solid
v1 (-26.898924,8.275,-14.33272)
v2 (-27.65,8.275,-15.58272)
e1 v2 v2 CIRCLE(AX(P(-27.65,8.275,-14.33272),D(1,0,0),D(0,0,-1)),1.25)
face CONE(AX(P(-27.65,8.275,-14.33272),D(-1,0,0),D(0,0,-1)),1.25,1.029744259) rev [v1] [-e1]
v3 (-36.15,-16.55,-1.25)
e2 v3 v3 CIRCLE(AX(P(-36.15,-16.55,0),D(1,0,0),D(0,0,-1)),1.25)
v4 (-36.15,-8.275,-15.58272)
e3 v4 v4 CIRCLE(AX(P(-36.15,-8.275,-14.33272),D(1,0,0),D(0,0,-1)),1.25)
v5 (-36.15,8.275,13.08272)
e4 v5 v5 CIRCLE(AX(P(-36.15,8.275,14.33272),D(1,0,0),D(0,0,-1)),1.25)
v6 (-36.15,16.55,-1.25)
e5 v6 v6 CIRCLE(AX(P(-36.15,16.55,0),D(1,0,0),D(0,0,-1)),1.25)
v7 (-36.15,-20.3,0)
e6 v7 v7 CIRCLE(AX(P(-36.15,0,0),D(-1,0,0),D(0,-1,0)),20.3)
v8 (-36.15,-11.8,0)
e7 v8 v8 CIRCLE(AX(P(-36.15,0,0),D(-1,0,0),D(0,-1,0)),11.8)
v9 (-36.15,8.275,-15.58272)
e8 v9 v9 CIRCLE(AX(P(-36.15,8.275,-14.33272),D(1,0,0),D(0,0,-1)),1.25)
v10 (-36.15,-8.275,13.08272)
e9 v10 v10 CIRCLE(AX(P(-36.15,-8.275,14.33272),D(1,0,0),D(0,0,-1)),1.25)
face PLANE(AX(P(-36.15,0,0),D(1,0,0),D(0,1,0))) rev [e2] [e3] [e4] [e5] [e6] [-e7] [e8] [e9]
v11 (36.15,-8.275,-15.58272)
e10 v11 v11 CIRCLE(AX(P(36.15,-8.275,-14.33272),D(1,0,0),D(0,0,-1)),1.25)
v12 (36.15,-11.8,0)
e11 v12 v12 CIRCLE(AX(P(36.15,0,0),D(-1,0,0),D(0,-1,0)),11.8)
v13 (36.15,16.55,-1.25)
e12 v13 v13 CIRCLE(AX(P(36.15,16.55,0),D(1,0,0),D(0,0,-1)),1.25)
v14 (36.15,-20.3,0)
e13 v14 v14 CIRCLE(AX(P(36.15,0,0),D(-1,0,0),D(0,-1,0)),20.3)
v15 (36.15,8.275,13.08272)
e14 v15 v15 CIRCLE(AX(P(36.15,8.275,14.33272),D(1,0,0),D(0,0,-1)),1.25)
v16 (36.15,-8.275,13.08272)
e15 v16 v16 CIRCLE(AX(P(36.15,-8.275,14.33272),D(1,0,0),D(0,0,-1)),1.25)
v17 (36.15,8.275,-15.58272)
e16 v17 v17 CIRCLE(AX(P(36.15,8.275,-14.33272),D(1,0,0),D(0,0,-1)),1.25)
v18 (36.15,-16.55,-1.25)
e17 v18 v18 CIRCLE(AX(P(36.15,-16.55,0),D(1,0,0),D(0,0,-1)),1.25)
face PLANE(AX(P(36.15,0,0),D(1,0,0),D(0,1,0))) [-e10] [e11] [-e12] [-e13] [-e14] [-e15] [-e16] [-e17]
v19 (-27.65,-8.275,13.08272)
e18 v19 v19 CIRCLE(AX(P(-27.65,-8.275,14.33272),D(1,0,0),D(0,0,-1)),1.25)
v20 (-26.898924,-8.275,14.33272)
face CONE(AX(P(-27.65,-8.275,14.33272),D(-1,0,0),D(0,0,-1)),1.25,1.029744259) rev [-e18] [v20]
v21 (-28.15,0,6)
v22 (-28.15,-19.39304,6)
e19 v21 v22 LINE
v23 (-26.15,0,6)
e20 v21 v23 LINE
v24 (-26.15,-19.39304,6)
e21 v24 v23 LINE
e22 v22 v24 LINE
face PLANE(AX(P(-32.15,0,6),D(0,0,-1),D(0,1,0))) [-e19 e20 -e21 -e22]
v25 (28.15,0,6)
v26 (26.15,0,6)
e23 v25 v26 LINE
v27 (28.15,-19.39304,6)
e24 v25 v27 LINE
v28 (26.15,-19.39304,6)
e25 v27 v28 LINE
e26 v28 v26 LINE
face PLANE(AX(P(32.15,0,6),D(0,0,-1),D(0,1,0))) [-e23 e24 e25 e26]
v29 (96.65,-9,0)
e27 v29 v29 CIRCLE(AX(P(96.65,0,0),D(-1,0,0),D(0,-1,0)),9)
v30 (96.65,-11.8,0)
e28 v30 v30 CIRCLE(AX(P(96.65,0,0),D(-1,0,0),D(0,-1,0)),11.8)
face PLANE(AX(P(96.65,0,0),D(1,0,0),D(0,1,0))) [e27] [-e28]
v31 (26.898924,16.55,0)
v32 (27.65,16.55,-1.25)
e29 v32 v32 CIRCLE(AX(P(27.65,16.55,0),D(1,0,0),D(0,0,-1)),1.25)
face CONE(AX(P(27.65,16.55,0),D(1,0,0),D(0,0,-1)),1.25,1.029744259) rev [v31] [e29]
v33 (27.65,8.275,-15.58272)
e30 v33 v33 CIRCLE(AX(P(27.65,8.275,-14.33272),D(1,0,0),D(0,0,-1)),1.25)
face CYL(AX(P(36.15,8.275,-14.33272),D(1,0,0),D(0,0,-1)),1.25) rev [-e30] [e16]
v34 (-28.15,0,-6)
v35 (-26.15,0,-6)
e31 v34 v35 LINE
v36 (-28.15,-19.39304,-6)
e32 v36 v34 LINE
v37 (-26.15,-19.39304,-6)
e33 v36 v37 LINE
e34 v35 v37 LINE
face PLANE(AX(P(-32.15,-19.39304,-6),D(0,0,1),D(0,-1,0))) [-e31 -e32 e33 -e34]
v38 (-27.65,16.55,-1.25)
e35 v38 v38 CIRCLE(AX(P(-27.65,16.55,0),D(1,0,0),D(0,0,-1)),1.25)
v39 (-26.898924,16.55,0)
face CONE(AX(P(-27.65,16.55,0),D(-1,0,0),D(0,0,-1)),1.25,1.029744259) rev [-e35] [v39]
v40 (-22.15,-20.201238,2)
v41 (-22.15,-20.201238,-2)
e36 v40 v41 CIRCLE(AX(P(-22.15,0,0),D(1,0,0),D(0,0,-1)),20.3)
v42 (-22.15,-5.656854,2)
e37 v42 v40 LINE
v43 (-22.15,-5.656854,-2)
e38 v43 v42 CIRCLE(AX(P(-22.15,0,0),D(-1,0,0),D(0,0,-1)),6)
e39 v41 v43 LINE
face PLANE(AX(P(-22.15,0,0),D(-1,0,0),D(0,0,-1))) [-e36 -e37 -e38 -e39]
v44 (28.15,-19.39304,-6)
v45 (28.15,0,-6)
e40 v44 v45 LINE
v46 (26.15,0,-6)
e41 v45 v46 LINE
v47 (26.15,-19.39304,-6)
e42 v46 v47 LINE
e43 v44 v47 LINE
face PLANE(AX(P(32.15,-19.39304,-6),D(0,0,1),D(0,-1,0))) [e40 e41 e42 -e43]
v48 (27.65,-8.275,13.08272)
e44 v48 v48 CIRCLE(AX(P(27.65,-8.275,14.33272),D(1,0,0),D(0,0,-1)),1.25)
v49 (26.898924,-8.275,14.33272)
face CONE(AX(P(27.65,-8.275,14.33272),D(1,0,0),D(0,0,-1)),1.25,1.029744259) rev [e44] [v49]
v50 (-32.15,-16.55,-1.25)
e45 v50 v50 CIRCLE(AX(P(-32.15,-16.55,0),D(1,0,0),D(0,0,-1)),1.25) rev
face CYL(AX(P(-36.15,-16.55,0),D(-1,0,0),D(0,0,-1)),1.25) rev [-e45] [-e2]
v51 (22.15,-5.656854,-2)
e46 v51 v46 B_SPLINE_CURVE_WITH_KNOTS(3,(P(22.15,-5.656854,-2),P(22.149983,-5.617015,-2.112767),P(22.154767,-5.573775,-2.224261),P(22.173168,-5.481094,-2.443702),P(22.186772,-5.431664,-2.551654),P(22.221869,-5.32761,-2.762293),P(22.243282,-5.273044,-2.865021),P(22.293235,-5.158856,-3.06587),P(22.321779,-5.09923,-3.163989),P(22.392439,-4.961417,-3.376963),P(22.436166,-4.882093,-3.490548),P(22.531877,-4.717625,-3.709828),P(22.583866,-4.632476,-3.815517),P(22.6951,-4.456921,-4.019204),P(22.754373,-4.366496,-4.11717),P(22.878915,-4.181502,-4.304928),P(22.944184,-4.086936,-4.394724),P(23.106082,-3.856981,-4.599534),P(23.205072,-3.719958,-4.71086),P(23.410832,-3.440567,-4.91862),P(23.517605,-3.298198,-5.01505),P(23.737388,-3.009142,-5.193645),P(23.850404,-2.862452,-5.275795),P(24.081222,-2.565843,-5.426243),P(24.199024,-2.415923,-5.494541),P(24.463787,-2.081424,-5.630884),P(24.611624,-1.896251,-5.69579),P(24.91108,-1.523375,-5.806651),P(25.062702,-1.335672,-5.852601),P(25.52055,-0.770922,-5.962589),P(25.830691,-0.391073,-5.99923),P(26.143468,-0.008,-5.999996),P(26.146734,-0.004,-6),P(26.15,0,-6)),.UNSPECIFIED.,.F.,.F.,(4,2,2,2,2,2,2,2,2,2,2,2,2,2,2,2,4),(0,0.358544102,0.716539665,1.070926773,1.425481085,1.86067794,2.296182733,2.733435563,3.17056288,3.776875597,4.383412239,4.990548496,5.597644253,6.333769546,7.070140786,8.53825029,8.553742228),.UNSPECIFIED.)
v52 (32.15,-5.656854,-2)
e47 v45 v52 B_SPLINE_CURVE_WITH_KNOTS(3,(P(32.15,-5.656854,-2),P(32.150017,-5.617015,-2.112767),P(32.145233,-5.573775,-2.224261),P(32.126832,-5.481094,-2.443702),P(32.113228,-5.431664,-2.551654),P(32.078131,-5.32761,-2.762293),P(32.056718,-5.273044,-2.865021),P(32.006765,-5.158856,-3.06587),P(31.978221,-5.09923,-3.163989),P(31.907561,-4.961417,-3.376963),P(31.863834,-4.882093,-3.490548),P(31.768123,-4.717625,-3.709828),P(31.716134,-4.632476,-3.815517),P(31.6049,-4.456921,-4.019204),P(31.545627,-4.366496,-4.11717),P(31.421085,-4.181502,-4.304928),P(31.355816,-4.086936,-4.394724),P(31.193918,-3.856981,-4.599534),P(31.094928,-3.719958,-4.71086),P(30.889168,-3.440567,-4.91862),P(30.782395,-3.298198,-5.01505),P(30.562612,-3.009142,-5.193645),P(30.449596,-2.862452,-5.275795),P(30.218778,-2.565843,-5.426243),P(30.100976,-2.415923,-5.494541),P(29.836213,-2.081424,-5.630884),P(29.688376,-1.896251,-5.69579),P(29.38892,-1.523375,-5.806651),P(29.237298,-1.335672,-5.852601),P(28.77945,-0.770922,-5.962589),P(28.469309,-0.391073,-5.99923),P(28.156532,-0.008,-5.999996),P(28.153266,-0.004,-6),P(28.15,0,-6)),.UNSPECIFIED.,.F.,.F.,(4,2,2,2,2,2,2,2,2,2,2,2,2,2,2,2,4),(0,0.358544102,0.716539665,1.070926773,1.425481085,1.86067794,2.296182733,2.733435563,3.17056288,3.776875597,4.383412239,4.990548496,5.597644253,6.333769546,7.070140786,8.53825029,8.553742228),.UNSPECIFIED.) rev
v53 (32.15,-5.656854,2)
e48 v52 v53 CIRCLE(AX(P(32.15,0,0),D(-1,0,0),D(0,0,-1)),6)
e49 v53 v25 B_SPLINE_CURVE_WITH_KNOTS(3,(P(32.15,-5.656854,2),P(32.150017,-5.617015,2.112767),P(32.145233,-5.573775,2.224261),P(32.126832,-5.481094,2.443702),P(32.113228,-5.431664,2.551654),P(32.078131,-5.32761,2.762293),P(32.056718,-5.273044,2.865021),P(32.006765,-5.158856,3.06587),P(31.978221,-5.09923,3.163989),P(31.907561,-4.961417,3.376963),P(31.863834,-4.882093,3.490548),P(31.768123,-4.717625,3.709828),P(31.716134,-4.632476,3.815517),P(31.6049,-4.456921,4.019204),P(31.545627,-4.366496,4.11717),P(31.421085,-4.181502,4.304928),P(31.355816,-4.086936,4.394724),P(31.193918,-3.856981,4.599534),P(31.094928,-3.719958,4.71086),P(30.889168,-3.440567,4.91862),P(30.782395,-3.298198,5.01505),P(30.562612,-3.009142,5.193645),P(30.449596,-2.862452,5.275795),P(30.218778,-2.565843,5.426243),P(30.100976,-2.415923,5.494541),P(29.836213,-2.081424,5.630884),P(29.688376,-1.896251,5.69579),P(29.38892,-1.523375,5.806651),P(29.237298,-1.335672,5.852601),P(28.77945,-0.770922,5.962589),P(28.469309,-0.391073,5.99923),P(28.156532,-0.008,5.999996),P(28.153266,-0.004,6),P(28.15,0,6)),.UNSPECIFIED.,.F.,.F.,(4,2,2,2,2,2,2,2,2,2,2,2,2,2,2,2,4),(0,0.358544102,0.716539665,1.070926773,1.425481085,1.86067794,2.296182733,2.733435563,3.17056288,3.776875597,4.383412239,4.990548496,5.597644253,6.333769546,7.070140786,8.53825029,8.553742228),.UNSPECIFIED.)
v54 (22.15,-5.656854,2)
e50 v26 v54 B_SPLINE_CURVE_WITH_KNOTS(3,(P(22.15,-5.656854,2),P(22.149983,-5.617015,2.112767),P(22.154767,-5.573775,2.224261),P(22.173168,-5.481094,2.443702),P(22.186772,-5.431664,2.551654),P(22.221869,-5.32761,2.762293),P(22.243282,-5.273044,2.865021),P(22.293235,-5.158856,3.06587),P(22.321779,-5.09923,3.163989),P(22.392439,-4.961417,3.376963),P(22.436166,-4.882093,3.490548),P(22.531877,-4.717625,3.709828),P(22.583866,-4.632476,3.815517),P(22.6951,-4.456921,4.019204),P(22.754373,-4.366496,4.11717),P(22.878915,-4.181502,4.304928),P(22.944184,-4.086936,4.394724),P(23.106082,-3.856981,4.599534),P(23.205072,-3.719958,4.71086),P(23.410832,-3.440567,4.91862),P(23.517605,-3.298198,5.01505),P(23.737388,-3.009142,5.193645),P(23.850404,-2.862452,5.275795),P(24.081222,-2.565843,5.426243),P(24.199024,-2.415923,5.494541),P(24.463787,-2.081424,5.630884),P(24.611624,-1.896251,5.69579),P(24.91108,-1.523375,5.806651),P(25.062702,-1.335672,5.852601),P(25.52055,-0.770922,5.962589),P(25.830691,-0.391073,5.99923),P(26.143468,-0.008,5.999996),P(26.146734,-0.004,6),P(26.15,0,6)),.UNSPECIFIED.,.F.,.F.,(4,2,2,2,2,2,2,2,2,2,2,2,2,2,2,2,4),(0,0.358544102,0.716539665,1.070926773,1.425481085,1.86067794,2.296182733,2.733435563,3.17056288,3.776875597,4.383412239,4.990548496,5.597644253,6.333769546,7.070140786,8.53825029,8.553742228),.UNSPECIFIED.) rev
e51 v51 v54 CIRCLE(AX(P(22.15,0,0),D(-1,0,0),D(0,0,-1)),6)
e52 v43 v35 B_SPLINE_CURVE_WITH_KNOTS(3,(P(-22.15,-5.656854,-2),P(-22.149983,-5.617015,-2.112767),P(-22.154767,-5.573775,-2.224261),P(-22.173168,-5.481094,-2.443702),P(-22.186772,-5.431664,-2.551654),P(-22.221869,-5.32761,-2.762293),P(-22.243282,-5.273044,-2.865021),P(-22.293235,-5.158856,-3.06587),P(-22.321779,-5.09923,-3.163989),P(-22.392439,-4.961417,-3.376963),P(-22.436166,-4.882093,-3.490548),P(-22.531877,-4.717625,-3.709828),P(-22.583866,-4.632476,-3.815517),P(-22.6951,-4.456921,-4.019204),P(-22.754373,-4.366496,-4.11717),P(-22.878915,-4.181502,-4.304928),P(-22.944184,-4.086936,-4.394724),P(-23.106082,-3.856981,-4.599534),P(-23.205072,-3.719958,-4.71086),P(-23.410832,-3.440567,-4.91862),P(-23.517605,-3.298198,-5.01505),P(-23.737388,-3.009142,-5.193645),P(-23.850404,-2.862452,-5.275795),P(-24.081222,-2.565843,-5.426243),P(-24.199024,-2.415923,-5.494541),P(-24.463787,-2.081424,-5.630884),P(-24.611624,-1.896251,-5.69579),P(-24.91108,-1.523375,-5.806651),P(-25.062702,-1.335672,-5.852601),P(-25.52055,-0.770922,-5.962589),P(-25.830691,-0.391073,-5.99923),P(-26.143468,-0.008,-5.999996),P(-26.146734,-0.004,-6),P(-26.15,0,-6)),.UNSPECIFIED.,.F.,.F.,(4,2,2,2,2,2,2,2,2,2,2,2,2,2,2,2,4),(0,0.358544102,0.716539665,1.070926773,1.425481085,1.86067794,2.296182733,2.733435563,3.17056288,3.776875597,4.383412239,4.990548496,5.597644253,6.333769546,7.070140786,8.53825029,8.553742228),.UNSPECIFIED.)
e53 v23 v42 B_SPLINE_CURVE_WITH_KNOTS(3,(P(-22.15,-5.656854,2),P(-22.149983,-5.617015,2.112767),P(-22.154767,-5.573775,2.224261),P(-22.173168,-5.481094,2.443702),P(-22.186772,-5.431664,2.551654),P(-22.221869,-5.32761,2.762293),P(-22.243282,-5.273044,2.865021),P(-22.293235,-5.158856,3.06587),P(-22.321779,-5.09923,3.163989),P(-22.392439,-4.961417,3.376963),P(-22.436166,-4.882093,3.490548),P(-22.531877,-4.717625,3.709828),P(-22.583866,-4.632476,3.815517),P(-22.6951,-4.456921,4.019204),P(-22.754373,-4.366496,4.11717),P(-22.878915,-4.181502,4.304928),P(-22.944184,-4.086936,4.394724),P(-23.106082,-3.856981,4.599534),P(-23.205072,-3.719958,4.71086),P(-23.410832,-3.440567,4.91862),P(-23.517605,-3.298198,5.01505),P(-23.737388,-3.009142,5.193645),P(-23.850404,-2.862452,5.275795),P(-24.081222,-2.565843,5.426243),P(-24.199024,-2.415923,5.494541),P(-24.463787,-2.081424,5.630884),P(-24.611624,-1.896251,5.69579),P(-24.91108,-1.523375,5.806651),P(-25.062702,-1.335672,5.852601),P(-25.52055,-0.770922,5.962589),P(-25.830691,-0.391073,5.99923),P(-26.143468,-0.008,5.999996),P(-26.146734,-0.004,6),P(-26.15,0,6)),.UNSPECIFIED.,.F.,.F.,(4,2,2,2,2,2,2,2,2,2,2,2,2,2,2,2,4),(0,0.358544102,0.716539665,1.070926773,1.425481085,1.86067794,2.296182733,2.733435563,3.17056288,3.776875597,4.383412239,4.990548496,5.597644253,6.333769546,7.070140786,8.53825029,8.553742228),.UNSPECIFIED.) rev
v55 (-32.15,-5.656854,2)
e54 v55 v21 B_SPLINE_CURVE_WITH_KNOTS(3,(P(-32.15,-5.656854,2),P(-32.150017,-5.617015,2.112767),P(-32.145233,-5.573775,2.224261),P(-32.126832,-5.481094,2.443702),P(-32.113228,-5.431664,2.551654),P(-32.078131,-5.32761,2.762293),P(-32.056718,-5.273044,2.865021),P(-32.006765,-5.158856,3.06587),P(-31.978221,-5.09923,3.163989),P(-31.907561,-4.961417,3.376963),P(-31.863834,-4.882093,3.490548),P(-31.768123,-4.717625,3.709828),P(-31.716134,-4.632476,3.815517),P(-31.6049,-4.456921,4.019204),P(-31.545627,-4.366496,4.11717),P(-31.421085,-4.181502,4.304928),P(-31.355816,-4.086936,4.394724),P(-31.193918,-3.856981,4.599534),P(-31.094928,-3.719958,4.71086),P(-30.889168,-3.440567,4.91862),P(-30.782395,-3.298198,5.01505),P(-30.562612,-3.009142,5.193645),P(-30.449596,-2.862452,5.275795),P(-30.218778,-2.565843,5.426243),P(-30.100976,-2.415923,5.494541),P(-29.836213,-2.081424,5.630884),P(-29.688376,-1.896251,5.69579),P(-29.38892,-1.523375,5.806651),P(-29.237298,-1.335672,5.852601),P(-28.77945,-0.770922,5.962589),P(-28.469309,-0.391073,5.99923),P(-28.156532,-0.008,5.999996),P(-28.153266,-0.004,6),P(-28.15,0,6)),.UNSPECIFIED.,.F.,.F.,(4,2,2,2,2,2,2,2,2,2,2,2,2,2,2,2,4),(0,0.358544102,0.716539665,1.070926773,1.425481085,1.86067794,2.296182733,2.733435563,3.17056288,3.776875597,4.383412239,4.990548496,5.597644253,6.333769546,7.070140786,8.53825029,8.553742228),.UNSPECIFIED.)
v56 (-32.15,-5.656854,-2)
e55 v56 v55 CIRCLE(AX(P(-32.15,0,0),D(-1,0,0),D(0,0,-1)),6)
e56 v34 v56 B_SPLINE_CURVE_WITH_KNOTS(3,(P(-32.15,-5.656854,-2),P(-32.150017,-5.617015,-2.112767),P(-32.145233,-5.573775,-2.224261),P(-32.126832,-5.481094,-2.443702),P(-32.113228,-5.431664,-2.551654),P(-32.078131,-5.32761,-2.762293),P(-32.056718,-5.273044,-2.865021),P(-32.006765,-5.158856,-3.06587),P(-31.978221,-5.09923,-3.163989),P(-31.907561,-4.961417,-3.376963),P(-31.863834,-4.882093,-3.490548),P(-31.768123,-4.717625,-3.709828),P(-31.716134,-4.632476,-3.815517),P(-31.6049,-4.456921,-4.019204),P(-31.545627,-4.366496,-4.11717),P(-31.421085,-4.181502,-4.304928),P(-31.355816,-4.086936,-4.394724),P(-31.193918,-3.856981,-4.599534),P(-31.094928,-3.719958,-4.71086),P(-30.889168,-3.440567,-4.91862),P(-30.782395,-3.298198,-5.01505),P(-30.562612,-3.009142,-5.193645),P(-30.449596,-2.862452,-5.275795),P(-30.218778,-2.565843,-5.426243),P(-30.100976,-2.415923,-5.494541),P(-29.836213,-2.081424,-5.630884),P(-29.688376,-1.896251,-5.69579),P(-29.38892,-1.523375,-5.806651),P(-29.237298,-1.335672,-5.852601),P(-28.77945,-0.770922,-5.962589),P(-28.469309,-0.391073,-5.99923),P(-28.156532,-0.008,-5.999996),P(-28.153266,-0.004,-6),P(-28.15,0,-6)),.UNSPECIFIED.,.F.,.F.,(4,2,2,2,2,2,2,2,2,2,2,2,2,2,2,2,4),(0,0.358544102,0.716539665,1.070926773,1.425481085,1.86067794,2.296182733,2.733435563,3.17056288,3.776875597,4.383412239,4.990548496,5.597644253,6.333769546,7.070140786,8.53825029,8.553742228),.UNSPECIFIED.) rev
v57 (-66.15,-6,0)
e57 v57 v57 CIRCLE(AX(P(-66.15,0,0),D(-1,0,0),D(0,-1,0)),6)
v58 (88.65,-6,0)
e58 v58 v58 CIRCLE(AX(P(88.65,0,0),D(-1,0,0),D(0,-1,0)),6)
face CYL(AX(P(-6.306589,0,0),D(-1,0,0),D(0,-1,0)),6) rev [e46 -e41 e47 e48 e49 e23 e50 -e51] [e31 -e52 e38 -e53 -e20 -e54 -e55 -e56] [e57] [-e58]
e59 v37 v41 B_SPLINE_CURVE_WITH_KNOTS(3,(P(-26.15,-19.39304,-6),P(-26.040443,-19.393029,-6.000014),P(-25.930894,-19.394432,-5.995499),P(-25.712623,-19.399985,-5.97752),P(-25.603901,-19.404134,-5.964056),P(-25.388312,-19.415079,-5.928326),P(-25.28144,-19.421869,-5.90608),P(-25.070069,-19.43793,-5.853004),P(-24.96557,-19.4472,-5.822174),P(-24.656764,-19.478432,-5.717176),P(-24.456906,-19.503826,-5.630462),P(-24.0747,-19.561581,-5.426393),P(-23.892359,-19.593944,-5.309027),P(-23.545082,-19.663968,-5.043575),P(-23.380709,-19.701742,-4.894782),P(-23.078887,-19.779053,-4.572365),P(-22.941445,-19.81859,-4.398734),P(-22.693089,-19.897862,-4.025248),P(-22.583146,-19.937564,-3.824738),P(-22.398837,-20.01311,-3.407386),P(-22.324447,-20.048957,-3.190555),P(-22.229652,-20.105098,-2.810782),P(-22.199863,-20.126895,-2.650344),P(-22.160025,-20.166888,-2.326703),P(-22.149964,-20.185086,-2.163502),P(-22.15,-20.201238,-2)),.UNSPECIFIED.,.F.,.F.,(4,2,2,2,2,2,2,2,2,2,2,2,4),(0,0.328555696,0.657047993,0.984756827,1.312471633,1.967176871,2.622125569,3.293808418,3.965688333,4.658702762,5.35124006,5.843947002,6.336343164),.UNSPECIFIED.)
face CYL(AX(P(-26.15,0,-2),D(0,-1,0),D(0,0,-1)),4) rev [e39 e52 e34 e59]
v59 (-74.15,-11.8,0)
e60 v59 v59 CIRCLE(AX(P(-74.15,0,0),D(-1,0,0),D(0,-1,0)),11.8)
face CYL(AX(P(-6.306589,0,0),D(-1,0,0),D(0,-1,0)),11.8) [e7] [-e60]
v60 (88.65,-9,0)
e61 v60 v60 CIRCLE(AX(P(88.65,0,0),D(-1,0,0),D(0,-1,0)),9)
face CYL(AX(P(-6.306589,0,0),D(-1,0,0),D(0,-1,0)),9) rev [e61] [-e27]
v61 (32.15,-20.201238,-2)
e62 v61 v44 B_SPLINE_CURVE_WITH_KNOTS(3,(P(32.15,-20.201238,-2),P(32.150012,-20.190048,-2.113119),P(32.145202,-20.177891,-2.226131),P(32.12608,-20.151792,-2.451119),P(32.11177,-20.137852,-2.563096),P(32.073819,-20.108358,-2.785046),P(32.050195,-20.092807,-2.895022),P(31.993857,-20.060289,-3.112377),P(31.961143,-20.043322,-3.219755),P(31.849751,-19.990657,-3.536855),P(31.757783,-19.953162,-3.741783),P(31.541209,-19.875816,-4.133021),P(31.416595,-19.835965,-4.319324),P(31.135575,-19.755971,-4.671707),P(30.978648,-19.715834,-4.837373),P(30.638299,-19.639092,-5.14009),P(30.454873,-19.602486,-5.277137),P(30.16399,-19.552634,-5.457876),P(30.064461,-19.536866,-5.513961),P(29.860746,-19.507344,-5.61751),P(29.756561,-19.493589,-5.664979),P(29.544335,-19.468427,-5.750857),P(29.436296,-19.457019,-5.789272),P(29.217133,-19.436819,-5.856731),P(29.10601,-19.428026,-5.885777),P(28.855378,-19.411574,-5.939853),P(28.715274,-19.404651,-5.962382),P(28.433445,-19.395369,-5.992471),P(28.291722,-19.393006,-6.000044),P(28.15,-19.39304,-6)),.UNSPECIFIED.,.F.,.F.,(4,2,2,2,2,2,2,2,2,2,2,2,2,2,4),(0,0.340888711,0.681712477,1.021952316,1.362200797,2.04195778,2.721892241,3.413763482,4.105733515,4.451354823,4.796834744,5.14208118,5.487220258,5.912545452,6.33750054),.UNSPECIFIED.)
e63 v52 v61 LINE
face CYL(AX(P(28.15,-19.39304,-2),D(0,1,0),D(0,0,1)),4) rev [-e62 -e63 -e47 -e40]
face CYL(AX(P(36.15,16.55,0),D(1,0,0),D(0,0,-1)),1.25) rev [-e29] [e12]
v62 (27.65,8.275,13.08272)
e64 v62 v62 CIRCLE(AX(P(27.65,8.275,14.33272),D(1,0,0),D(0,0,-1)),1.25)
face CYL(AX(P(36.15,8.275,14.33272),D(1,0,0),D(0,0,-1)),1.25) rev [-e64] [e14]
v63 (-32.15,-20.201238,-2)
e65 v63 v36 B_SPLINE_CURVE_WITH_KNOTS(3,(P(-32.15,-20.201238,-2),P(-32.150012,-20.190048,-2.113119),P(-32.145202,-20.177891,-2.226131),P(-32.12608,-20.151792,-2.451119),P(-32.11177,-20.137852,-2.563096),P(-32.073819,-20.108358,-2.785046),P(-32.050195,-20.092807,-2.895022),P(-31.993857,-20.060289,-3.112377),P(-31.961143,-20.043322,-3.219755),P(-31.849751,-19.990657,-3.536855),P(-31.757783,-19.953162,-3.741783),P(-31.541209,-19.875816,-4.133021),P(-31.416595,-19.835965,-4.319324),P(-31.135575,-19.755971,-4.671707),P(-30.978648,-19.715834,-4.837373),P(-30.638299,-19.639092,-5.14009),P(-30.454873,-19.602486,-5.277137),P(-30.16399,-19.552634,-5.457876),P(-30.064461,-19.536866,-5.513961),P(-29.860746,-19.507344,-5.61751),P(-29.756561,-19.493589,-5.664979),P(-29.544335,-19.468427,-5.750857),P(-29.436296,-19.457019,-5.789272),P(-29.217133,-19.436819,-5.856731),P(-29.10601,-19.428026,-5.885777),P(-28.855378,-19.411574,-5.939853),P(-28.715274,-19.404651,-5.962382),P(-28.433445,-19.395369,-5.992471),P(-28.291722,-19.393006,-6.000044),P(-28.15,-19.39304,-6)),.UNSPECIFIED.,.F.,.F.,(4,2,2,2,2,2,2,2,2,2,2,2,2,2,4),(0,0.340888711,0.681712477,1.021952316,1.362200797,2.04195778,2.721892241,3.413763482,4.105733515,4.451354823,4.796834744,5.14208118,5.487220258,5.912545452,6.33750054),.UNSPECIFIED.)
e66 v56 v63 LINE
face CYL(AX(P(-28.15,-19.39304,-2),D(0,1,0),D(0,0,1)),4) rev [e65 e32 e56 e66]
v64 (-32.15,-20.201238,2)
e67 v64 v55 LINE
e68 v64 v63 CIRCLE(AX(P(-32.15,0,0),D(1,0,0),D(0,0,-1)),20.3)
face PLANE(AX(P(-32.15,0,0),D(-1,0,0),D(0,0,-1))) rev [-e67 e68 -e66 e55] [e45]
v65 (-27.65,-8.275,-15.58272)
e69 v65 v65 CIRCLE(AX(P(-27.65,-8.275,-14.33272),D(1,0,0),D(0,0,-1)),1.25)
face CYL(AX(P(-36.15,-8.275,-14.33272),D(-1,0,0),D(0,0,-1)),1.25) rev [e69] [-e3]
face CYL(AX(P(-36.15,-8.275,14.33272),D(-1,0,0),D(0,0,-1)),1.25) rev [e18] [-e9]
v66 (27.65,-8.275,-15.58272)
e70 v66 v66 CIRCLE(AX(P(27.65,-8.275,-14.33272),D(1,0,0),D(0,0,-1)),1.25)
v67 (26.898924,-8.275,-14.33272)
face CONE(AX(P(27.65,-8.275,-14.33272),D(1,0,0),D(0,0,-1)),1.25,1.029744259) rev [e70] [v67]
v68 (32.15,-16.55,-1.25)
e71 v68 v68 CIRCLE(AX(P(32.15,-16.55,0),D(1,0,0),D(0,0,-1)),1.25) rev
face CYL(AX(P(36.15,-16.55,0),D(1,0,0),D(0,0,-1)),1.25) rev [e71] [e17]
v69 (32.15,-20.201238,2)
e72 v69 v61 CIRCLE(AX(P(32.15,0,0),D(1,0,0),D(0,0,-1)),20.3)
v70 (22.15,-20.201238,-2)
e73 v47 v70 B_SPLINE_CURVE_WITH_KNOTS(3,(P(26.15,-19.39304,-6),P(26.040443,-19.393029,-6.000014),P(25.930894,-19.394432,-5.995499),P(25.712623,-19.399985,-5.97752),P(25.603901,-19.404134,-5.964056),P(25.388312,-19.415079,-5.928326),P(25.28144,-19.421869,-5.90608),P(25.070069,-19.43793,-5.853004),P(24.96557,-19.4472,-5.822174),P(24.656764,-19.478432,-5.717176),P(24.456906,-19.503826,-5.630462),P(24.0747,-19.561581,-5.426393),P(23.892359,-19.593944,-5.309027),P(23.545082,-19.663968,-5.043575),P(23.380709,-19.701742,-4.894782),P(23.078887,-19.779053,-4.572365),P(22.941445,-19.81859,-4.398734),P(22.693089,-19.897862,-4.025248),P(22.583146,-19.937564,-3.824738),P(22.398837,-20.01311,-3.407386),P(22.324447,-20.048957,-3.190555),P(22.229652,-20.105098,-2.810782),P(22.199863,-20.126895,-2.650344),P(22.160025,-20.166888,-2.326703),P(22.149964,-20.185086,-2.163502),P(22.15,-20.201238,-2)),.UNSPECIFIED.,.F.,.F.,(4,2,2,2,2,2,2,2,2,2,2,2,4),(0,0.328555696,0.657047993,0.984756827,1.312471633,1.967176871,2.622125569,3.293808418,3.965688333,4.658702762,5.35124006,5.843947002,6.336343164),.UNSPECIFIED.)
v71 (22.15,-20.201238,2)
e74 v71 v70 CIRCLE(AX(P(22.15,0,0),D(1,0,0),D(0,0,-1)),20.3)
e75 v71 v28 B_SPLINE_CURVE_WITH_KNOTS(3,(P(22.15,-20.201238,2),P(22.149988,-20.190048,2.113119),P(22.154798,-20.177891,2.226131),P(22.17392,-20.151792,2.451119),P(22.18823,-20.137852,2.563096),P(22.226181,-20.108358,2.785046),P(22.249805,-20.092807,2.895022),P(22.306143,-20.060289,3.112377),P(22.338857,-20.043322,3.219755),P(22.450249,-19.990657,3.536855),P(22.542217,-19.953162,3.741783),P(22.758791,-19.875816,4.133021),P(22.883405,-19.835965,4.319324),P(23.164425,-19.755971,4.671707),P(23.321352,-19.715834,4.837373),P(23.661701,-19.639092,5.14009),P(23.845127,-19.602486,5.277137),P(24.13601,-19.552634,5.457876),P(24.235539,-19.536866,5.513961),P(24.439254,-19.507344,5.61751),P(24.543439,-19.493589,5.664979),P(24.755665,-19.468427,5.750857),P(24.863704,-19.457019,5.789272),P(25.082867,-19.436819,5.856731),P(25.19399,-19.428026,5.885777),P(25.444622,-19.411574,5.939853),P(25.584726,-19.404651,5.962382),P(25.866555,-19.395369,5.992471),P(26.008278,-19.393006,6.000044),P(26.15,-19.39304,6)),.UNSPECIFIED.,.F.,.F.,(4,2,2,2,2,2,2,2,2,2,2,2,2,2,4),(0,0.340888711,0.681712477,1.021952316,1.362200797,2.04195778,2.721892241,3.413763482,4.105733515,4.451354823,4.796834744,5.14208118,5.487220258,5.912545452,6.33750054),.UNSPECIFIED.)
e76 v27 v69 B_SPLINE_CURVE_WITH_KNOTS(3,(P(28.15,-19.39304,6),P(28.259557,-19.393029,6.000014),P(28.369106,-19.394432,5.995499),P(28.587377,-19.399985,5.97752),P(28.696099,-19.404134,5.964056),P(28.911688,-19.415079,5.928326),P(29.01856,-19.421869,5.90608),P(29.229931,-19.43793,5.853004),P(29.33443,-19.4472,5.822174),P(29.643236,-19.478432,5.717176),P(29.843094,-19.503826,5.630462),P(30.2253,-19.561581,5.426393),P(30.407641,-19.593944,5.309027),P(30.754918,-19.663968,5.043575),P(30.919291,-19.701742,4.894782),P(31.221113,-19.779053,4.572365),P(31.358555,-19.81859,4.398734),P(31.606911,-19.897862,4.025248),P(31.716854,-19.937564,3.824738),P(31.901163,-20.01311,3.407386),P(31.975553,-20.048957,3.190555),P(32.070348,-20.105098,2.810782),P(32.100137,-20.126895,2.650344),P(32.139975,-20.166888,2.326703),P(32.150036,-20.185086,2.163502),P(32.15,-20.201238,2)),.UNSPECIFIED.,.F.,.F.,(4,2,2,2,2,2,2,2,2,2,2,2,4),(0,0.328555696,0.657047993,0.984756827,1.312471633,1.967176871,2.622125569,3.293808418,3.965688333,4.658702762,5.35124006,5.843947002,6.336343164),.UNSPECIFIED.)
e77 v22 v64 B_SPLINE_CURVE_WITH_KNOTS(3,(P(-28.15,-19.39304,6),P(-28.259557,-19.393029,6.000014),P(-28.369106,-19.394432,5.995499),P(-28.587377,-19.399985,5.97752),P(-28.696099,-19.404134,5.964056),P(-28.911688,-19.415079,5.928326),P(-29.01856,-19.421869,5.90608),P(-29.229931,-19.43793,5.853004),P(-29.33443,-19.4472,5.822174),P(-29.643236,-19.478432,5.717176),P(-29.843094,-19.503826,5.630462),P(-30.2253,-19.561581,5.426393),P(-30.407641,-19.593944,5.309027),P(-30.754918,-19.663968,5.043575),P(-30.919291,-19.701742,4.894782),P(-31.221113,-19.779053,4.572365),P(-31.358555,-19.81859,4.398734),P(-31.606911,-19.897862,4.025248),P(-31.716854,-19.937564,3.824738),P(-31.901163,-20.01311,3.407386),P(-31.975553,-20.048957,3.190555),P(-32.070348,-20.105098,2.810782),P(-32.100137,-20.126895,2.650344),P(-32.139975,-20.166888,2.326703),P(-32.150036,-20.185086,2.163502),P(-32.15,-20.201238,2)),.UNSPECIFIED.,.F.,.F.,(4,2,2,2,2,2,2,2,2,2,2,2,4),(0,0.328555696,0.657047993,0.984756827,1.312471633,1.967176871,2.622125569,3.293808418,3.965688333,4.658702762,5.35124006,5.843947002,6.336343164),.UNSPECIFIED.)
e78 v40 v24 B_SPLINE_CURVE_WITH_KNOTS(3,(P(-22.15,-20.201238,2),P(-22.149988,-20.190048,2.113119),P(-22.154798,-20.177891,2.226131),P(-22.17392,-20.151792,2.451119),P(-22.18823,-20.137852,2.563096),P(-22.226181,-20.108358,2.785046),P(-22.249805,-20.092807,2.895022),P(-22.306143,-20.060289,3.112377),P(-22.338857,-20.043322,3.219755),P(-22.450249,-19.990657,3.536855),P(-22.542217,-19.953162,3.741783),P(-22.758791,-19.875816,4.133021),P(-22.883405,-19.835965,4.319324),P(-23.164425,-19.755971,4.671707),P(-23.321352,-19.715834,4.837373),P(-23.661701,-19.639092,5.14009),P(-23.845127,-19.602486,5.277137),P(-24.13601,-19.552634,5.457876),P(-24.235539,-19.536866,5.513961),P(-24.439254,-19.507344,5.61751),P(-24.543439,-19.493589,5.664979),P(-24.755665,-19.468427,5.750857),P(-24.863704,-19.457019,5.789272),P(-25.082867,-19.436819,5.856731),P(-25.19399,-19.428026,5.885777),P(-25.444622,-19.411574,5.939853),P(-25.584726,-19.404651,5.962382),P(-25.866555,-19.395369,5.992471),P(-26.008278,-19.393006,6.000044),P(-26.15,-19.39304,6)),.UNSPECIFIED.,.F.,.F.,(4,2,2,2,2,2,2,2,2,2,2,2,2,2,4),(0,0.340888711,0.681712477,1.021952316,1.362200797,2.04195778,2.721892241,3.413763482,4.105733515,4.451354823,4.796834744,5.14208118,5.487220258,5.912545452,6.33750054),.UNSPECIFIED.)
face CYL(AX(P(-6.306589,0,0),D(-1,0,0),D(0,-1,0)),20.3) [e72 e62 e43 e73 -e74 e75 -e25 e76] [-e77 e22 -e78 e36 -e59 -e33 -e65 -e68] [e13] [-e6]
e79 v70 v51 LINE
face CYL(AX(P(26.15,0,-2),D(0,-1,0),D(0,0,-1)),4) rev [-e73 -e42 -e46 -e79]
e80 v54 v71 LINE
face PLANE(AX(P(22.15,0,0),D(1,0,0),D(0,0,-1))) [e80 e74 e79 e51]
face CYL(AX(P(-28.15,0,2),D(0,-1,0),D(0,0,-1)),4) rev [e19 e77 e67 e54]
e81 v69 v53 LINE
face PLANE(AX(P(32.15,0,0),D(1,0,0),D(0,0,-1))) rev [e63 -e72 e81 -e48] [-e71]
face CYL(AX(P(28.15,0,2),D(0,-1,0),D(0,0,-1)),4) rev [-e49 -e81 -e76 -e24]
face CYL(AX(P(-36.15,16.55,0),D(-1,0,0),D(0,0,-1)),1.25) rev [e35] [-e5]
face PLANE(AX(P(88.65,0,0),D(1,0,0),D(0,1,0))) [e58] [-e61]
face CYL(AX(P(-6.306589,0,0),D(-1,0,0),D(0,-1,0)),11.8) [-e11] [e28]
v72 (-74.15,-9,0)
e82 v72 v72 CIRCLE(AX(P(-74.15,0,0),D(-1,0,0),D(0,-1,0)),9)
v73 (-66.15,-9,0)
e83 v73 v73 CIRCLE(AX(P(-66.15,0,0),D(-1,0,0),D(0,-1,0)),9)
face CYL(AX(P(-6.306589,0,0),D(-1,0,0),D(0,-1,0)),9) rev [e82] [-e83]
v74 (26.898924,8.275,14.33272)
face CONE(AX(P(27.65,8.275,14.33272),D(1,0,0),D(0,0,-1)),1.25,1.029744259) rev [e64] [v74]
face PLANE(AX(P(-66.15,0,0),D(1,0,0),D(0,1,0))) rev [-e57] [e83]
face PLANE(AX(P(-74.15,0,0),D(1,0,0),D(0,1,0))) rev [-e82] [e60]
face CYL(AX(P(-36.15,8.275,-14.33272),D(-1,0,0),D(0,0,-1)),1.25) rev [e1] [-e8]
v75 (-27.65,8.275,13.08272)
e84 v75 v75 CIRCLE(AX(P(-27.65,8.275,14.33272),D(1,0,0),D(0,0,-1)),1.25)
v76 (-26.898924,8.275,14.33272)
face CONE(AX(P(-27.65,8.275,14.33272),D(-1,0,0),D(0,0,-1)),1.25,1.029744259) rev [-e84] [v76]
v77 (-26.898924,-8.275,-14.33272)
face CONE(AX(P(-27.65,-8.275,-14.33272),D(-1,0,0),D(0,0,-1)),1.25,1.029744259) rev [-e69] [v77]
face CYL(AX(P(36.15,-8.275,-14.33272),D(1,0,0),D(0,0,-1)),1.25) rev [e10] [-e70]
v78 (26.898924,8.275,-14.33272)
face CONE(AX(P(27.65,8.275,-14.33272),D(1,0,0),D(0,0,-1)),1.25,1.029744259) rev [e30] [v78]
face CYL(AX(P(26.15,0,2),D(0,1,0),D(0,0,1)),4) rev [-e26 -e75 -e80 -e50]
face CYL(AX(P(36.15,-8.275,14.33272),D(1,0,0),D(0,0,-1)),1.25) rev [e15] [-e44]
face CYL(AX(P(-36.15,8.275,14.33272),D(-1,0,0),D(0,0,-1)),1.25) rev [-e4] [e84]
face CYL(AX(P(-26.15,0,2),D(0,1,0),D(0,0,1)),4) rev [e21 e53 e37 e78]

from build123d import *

# Parameters (mm, degrees)
CIRPATTERN1_COUNT   = 6
CUT_EXTRUDE2_START  = 22.15
CUT_EXTRUDE2_DEPTH  = 10
FILLET1_R           = 4
MIRROR1_START       = -36.15
MIRROR1_OUTLINE_R   = 1.25
MIRROR1_DEPTH       = 8.4999999
MIRROR1_START_2     = -28.15
MIRROR1_2_OUTLINE_R = 1.25
MIRROR1_2_DEPTH     = 6
MIRROR1_START_3     = -21
MIRROR1_3_DEPTH     = 21


with BuildPart() as part:
    # Sketch1 → Revolve1 (revolve)
    with BuildSketch(Plane.XY, mode=Mode.PRIVATE) as revolve1_sk:
        Polygon((0, 6), (0, 20.3), (36.15, 20.3), (36.15, 11.8), (96.65, 11.8), (96.65, 9), (88.65, 9), (88.65, 6), align=None)
    revolve(revolve1_sk.sketch.rotate(Axis((-6.306589334, 0, 0), (1, 0, 0)), 180), axis=Axis((-6.306589334, 0, 0), (1, 0, 0)))

    # Sketch4 → M3 Tapped Hole1 (revolve, cut)
    with BuildSketch(Plane(origin=(36.15, 16.55, 0), x_dir=(0, 0, -1), z_dir=(0, 1, 0))):
        Polygon((0, 0), (0, 9.251075774), (1.25, 8.5), (1.25, 0), align=None)
    m3_tapped_hole1 = revolve(axis=Axis((42.5, 16.55, 0), (-1, 0, 0)), mode=Mode.SUBTRACT)

    # CirPattern1: M3 Tapped Hole1 ×6 about axis
    cirpattern1_axis = Axis((0, 0, 0), (1, 0, 0))
    for i in range(1, CIRPATTERN1_COUNT):
        add(m3_tapped_hole1.rotate(cirpattern1_axis, i * 360 / CIRPATTERN1_COUNT), mode=Mode.SUBTRACT)

    # Sketch5 → Cut-Extrude2 (cut)
    with BuildSketch(Plane(origin=(0, 0, 0), x_dir=(0, 0, -1), z_dir=(1, 0, 0)).offset(CUT_EXTRUDE2_START)):
        with BuildLine():
            Line((-6, 0), (-6, -19.393039989))
            ThreePointArc((-6, -19.393039989), (0, -20.3), (6, -19.393039989))
            Line((6, -19.393039989), (6, 0))
            ThreePointArc((6, 0), (0, -6), (-6, 0))
        make_face()
    extrude(amount=CUT_EXTRUDE2_DEPTH, mode=Mode.SUBTRACT)

    # Sketch1<3> → Revolve2 (revolve)
    with BuildSketch(Plane.XY, mode=Mode.PRIVATE) as revolve2_sk:
        Polygon((-66.15, 9), (-66.15, 6), (0, 6), (0, 20.3), (-36.15, 20.3), (-36.15, 11.8), (-74.15, 11.8), (-74.15, 9), align=None)
    revolve(revolve2_sk.sketch.rotate(Axis((-6.306589334, 0, 0), (1, 0, 0)), 180), axis=Axis((-6.306589334, 0, 0), (1, 0, 0)))

    # Fillet1
    # the kernel refuses this fillet: 4 mm, written as the material it adds along each edge
    with BuildSketch(Plane(origin=(32.15, 10, 6), x_dir=(-1, 0, 0), z_dir=(0, -1, 0))) as fillet1_piece_1_section:
        with BuildLine():
            CenterArc((FILLET1_R, FILLET1_R), FILLET1_R, 180, 90)
            Line((0, FILLET1_R), (0, 0))
            Line((0, 0), (FILLET1_R, 0))
        make_face()
    fillet1_piece_1 = extrude(amount=39.393039989, mode=Mode.PRIVATE)
    fillet1_piece_1 = fillet1_piece_1 - Plane(origin=(32.15, 0, 0), x_dir=(0, -1, 0), z_dir=(-1, 0, 0)) * Cylinder(6, 95, mode=Mode.PRIVATE)
    fillet1_piece_1 = fillet1_piece_1 & Plane(origin=(32.15, 0, 0), x_dir=(0, -1, 0), z_dir=(1, 0, 0)) * Cylinder(20.3, 95, mode=Mode.PRIVATE)
    add(fillet1_piece_1)
    with BuildSketch(Plane(origin=(32.15, -29.393039989, -6), x_dir=(-1, 0, 0), z_dir=(0, 1, 0))) as fillet1_piece_2_section:
        with BuildLine():
            CenterArc((FILLET1_R, FILLET1_R), FILLET1_R, 180, 90)
            Line((0, FILLET1_R), (0, 0))
            Line((0, 0), (FILLET1_R, 0))
        make_face()
    fillet1_piece_2 = extrude(amount=39.393039989, mode=Mode.PRIVATE)
    fillet1_piece_2 = fillet1_piece_2 - Plane(origin=(32.15, 0, 0), x_dir=(0, -1, 0), z_dir=(-1, 0, 0)) * Cylinder(6, 95, mode=Mode.PRIVATE)
    fillet1_piece_2 = fillet1_piece_2 & Plane(origin=(32.15, 0, 0), x_dir=(0, -1, 0), z_dir=(1, 0, 0)) * Cylinder(20.3, 95, mode=Mode.PRIVATE)
    add(fillet1_piece_2)
    with BuildSketch(Plane(origin=(22.15, 10, 6), x_dir=(0, 0, -1), z_dir=(0, -1, 0))) as fillet1_piece_3_section:
        with BuildLine():
            CenterArc((FILLET1_R, FILLET1_R), FILLET1_R, 180, 90)
            Line((0, FILLET1_R), (0, 0))
            Line((0, 0), (FILLET1_R, 0))
        make_face()
    fillet1_piece_3 = extrude(amount=39.393039989, mode=Mode.PRIVATE)
    fillet1_piece_3 = fillet1_piece_3 - Plane(origin=(22.15, 0, 0), x_dir=(0, -1, 0), z_dir=(-1, 0, 0)) * Cylinder(6, 95, mode=Mode.PRIVATE)
    fillet1_piece_3 = fillet1_piece_3 & Plane(origin=(22.15, 0, 0), x_dir=(0, -1, 0), z_dir=(1, 0, 0)) * Cylinder(20.3, 95, mode=Mode.PRIVATE)
    add(fillet1_piece_3)
    with BuildSketch(Plane(origin=(22.15, -29.393039989, -6), x_dir=(1, 0, 0), z_dir=(0, 1, 0))) as fillet1_piece_4_section:
        with BuildLine():
            CenterArc((FILLET1_R, -FILLET1_R), FILLET1_R, 90, 90)
            Line((0, -FILLET1_R), (0, 0))
            Line((0, 0), (FILLET1_R, 0))
        make_face()
    fillet1_piece_4 = extrude(amount=39.393039989, mode=Mode.PRIVATE)
    fillet1_piece_4 = fillet1_piece_4 - Plane(origin=(22.15, 0, 0), x_dir=(0, -1, 0), z_dir=(-1, 0, 0)) * Cylinder(6, 95, mode=Mode.PRIVATE)
    fillet1_piece_4 = fillet1_piece_4 & Plane(origin=(22.15, 0, 0), x_dir=(0, -1, 0), z_dir=(1, 0, 0)) * Cylinder(20.3, 95, mode=Mode.PRIVATE)
    add(fillet1_piece_4)

    # Mirror1: read off the stored shape, not the designer's step
    # Mirror1 outline → Mirror1 (cut)
    with BuildSketch(Plane.YZ.offset(MIRROR1_START)):
        with Locations((8.275, -14.332720433)):
            Circle(MIRROR1_OUTLINE_R)
        with Locations((-8.275, -14.332720433)):
            Circle(MIRROR1_OUTLINE_R)
        with Locations((-16.55, 0)):
            Circle(MIRROR1_OUTLINE_R)
        with Locations((-8.275, 14.332720433)):
            Circle(MIRROR1_OUTLINE_R)
        with Locations((8.275, 14.332720433)):
            Circle(MIRROR1_OUTLINE_R)
        with Locations((16.55, 0)):
            Circle(MIRROR1_OUTLINE_R)
    extrude(amount=MIRROR1_DEPTH, mode=Mode.SUBTRACT)

    # Mirror1 2 outline → Mirror1 2 (cut)
    with BuildSketch(Plane.YZ.offset(MIRROR1_START_2)):
        with Locations((-16.55, 0)):
            Circle(MIRROR1_2_OUTLINE_R)
    extrude(amount=MIRROR1_2_DEPTH, mode=Mode.SUBTRACT)

    # Mirror1 3 outline → Mirror1 3 (cut)
    with BuildSketch(Plane(origin=(0, 0, 0), x_dir=(1, 0, 0), z_dir=(0, 1, 0)).offset(MIRROR1_START_3)):
        with BuildLine():
            ThreePointArc((-28.15, 6), (-30.978427125, 4.828427125), (-32.15, 2))
            Line((-32.15, 2), (-32.15, -2))
            ThreePointArc((-32.15, -2), (-30.978427125, -4.828427125), (-28.15, -6))
            Line((-28.15, -6), (-26.15, -6))
            ThreePointArc((-26.15, -6), (-23.321572875, -4.828427125), (-22.15, -2))
            Line((-22.15, -2), (-22.15, 2))
            ThreePointArc((-22.15, 2), (-23.321572875, 4.828427125), (-26.15, 6))
            Line((-26.15, 6), (-28.15, 6))
        make_face()
    extrude(amount=MIRROR1_3_DEPTH, mode=Mode.SUBTRACT)

    # Mirror1 4 outline → Mirror1 4 (revolve, cut)
    with BuildSketch(Plane(origin=(0, 8.275, -14.332720433), x_dir=(0, 1, 0), z_dir=(0, 0, -1))):
        Polygon((1.25, -27.65), (0, -26.898924226), (0, -27.6500001), align=None)
    revolve(axis=Axis((0, 8.275, -14.332720433), (1, 0, 0)), mode=Mode.SUBTRACT)

    # Mirror1 5 outline → Mirror1 5 (revolve, cut)
    with BuildSketch(Plane(origin=(0, -8.275, -14.332720433), x_dir=(0, 1, 0), z_dir=(0, 0, -1))):
        Polygon((1.25, -27.65), (0, -26.898924226), (0, -27.6500001), align=None)
    revolve(axis=Axis((0, -8.275, -14.332720433), (1, 0, 0)), mode=Mode.SUBTRACT)

    # Mirror1 6 outline → Mirror1 6 (revolve, cut)
    with BuildSketch(Plane(origin=(0, -8.275, 14.332720433), x_dir=(0, 1, 0), z_dir=(0, 0, -1))):
        Polygon((1.25, -27.65), (0, -26.898924226), (0, -27.6500001), align=None)
    revolve(axis=Axis((0, -8.275, 14.332720433), (1, 0, 0)), mode=Mode.SUBTRACT)

    # Mirror1 7 outline → Mirror1 7 (revolve, cut)
    with BuildSketch(Plane(origin=(0, 8.275, 14.332720433), x_dir=(0, 1, 0), z_dir=(0, 0, -1))):
        Polygon((1.25, -27.65), (0, -26.898924226), (0, -27.6500001), align=None)
    revolve(axis=Axis((0, 8.275, 14.332720433), (1, 0, 0)), mode=Mode.SUBTRACT)

    # Mirror1 8 outline → Mirror1 8 (revolve, cut)
    with BuildSketch(Plane(origin=(0, 16.55, 0), x_dir=(0, 1, 0), z_dir=(0, 0, -1))):
        Polygon((1.25, -27.65), (0, -26.898924226), (0, -27.6500001), align=None)
    revolve(axis=Axis((0, 16.55, 0), (1, 0, 0)), mode=Mode.SUBTRACT)


solid = part.part
